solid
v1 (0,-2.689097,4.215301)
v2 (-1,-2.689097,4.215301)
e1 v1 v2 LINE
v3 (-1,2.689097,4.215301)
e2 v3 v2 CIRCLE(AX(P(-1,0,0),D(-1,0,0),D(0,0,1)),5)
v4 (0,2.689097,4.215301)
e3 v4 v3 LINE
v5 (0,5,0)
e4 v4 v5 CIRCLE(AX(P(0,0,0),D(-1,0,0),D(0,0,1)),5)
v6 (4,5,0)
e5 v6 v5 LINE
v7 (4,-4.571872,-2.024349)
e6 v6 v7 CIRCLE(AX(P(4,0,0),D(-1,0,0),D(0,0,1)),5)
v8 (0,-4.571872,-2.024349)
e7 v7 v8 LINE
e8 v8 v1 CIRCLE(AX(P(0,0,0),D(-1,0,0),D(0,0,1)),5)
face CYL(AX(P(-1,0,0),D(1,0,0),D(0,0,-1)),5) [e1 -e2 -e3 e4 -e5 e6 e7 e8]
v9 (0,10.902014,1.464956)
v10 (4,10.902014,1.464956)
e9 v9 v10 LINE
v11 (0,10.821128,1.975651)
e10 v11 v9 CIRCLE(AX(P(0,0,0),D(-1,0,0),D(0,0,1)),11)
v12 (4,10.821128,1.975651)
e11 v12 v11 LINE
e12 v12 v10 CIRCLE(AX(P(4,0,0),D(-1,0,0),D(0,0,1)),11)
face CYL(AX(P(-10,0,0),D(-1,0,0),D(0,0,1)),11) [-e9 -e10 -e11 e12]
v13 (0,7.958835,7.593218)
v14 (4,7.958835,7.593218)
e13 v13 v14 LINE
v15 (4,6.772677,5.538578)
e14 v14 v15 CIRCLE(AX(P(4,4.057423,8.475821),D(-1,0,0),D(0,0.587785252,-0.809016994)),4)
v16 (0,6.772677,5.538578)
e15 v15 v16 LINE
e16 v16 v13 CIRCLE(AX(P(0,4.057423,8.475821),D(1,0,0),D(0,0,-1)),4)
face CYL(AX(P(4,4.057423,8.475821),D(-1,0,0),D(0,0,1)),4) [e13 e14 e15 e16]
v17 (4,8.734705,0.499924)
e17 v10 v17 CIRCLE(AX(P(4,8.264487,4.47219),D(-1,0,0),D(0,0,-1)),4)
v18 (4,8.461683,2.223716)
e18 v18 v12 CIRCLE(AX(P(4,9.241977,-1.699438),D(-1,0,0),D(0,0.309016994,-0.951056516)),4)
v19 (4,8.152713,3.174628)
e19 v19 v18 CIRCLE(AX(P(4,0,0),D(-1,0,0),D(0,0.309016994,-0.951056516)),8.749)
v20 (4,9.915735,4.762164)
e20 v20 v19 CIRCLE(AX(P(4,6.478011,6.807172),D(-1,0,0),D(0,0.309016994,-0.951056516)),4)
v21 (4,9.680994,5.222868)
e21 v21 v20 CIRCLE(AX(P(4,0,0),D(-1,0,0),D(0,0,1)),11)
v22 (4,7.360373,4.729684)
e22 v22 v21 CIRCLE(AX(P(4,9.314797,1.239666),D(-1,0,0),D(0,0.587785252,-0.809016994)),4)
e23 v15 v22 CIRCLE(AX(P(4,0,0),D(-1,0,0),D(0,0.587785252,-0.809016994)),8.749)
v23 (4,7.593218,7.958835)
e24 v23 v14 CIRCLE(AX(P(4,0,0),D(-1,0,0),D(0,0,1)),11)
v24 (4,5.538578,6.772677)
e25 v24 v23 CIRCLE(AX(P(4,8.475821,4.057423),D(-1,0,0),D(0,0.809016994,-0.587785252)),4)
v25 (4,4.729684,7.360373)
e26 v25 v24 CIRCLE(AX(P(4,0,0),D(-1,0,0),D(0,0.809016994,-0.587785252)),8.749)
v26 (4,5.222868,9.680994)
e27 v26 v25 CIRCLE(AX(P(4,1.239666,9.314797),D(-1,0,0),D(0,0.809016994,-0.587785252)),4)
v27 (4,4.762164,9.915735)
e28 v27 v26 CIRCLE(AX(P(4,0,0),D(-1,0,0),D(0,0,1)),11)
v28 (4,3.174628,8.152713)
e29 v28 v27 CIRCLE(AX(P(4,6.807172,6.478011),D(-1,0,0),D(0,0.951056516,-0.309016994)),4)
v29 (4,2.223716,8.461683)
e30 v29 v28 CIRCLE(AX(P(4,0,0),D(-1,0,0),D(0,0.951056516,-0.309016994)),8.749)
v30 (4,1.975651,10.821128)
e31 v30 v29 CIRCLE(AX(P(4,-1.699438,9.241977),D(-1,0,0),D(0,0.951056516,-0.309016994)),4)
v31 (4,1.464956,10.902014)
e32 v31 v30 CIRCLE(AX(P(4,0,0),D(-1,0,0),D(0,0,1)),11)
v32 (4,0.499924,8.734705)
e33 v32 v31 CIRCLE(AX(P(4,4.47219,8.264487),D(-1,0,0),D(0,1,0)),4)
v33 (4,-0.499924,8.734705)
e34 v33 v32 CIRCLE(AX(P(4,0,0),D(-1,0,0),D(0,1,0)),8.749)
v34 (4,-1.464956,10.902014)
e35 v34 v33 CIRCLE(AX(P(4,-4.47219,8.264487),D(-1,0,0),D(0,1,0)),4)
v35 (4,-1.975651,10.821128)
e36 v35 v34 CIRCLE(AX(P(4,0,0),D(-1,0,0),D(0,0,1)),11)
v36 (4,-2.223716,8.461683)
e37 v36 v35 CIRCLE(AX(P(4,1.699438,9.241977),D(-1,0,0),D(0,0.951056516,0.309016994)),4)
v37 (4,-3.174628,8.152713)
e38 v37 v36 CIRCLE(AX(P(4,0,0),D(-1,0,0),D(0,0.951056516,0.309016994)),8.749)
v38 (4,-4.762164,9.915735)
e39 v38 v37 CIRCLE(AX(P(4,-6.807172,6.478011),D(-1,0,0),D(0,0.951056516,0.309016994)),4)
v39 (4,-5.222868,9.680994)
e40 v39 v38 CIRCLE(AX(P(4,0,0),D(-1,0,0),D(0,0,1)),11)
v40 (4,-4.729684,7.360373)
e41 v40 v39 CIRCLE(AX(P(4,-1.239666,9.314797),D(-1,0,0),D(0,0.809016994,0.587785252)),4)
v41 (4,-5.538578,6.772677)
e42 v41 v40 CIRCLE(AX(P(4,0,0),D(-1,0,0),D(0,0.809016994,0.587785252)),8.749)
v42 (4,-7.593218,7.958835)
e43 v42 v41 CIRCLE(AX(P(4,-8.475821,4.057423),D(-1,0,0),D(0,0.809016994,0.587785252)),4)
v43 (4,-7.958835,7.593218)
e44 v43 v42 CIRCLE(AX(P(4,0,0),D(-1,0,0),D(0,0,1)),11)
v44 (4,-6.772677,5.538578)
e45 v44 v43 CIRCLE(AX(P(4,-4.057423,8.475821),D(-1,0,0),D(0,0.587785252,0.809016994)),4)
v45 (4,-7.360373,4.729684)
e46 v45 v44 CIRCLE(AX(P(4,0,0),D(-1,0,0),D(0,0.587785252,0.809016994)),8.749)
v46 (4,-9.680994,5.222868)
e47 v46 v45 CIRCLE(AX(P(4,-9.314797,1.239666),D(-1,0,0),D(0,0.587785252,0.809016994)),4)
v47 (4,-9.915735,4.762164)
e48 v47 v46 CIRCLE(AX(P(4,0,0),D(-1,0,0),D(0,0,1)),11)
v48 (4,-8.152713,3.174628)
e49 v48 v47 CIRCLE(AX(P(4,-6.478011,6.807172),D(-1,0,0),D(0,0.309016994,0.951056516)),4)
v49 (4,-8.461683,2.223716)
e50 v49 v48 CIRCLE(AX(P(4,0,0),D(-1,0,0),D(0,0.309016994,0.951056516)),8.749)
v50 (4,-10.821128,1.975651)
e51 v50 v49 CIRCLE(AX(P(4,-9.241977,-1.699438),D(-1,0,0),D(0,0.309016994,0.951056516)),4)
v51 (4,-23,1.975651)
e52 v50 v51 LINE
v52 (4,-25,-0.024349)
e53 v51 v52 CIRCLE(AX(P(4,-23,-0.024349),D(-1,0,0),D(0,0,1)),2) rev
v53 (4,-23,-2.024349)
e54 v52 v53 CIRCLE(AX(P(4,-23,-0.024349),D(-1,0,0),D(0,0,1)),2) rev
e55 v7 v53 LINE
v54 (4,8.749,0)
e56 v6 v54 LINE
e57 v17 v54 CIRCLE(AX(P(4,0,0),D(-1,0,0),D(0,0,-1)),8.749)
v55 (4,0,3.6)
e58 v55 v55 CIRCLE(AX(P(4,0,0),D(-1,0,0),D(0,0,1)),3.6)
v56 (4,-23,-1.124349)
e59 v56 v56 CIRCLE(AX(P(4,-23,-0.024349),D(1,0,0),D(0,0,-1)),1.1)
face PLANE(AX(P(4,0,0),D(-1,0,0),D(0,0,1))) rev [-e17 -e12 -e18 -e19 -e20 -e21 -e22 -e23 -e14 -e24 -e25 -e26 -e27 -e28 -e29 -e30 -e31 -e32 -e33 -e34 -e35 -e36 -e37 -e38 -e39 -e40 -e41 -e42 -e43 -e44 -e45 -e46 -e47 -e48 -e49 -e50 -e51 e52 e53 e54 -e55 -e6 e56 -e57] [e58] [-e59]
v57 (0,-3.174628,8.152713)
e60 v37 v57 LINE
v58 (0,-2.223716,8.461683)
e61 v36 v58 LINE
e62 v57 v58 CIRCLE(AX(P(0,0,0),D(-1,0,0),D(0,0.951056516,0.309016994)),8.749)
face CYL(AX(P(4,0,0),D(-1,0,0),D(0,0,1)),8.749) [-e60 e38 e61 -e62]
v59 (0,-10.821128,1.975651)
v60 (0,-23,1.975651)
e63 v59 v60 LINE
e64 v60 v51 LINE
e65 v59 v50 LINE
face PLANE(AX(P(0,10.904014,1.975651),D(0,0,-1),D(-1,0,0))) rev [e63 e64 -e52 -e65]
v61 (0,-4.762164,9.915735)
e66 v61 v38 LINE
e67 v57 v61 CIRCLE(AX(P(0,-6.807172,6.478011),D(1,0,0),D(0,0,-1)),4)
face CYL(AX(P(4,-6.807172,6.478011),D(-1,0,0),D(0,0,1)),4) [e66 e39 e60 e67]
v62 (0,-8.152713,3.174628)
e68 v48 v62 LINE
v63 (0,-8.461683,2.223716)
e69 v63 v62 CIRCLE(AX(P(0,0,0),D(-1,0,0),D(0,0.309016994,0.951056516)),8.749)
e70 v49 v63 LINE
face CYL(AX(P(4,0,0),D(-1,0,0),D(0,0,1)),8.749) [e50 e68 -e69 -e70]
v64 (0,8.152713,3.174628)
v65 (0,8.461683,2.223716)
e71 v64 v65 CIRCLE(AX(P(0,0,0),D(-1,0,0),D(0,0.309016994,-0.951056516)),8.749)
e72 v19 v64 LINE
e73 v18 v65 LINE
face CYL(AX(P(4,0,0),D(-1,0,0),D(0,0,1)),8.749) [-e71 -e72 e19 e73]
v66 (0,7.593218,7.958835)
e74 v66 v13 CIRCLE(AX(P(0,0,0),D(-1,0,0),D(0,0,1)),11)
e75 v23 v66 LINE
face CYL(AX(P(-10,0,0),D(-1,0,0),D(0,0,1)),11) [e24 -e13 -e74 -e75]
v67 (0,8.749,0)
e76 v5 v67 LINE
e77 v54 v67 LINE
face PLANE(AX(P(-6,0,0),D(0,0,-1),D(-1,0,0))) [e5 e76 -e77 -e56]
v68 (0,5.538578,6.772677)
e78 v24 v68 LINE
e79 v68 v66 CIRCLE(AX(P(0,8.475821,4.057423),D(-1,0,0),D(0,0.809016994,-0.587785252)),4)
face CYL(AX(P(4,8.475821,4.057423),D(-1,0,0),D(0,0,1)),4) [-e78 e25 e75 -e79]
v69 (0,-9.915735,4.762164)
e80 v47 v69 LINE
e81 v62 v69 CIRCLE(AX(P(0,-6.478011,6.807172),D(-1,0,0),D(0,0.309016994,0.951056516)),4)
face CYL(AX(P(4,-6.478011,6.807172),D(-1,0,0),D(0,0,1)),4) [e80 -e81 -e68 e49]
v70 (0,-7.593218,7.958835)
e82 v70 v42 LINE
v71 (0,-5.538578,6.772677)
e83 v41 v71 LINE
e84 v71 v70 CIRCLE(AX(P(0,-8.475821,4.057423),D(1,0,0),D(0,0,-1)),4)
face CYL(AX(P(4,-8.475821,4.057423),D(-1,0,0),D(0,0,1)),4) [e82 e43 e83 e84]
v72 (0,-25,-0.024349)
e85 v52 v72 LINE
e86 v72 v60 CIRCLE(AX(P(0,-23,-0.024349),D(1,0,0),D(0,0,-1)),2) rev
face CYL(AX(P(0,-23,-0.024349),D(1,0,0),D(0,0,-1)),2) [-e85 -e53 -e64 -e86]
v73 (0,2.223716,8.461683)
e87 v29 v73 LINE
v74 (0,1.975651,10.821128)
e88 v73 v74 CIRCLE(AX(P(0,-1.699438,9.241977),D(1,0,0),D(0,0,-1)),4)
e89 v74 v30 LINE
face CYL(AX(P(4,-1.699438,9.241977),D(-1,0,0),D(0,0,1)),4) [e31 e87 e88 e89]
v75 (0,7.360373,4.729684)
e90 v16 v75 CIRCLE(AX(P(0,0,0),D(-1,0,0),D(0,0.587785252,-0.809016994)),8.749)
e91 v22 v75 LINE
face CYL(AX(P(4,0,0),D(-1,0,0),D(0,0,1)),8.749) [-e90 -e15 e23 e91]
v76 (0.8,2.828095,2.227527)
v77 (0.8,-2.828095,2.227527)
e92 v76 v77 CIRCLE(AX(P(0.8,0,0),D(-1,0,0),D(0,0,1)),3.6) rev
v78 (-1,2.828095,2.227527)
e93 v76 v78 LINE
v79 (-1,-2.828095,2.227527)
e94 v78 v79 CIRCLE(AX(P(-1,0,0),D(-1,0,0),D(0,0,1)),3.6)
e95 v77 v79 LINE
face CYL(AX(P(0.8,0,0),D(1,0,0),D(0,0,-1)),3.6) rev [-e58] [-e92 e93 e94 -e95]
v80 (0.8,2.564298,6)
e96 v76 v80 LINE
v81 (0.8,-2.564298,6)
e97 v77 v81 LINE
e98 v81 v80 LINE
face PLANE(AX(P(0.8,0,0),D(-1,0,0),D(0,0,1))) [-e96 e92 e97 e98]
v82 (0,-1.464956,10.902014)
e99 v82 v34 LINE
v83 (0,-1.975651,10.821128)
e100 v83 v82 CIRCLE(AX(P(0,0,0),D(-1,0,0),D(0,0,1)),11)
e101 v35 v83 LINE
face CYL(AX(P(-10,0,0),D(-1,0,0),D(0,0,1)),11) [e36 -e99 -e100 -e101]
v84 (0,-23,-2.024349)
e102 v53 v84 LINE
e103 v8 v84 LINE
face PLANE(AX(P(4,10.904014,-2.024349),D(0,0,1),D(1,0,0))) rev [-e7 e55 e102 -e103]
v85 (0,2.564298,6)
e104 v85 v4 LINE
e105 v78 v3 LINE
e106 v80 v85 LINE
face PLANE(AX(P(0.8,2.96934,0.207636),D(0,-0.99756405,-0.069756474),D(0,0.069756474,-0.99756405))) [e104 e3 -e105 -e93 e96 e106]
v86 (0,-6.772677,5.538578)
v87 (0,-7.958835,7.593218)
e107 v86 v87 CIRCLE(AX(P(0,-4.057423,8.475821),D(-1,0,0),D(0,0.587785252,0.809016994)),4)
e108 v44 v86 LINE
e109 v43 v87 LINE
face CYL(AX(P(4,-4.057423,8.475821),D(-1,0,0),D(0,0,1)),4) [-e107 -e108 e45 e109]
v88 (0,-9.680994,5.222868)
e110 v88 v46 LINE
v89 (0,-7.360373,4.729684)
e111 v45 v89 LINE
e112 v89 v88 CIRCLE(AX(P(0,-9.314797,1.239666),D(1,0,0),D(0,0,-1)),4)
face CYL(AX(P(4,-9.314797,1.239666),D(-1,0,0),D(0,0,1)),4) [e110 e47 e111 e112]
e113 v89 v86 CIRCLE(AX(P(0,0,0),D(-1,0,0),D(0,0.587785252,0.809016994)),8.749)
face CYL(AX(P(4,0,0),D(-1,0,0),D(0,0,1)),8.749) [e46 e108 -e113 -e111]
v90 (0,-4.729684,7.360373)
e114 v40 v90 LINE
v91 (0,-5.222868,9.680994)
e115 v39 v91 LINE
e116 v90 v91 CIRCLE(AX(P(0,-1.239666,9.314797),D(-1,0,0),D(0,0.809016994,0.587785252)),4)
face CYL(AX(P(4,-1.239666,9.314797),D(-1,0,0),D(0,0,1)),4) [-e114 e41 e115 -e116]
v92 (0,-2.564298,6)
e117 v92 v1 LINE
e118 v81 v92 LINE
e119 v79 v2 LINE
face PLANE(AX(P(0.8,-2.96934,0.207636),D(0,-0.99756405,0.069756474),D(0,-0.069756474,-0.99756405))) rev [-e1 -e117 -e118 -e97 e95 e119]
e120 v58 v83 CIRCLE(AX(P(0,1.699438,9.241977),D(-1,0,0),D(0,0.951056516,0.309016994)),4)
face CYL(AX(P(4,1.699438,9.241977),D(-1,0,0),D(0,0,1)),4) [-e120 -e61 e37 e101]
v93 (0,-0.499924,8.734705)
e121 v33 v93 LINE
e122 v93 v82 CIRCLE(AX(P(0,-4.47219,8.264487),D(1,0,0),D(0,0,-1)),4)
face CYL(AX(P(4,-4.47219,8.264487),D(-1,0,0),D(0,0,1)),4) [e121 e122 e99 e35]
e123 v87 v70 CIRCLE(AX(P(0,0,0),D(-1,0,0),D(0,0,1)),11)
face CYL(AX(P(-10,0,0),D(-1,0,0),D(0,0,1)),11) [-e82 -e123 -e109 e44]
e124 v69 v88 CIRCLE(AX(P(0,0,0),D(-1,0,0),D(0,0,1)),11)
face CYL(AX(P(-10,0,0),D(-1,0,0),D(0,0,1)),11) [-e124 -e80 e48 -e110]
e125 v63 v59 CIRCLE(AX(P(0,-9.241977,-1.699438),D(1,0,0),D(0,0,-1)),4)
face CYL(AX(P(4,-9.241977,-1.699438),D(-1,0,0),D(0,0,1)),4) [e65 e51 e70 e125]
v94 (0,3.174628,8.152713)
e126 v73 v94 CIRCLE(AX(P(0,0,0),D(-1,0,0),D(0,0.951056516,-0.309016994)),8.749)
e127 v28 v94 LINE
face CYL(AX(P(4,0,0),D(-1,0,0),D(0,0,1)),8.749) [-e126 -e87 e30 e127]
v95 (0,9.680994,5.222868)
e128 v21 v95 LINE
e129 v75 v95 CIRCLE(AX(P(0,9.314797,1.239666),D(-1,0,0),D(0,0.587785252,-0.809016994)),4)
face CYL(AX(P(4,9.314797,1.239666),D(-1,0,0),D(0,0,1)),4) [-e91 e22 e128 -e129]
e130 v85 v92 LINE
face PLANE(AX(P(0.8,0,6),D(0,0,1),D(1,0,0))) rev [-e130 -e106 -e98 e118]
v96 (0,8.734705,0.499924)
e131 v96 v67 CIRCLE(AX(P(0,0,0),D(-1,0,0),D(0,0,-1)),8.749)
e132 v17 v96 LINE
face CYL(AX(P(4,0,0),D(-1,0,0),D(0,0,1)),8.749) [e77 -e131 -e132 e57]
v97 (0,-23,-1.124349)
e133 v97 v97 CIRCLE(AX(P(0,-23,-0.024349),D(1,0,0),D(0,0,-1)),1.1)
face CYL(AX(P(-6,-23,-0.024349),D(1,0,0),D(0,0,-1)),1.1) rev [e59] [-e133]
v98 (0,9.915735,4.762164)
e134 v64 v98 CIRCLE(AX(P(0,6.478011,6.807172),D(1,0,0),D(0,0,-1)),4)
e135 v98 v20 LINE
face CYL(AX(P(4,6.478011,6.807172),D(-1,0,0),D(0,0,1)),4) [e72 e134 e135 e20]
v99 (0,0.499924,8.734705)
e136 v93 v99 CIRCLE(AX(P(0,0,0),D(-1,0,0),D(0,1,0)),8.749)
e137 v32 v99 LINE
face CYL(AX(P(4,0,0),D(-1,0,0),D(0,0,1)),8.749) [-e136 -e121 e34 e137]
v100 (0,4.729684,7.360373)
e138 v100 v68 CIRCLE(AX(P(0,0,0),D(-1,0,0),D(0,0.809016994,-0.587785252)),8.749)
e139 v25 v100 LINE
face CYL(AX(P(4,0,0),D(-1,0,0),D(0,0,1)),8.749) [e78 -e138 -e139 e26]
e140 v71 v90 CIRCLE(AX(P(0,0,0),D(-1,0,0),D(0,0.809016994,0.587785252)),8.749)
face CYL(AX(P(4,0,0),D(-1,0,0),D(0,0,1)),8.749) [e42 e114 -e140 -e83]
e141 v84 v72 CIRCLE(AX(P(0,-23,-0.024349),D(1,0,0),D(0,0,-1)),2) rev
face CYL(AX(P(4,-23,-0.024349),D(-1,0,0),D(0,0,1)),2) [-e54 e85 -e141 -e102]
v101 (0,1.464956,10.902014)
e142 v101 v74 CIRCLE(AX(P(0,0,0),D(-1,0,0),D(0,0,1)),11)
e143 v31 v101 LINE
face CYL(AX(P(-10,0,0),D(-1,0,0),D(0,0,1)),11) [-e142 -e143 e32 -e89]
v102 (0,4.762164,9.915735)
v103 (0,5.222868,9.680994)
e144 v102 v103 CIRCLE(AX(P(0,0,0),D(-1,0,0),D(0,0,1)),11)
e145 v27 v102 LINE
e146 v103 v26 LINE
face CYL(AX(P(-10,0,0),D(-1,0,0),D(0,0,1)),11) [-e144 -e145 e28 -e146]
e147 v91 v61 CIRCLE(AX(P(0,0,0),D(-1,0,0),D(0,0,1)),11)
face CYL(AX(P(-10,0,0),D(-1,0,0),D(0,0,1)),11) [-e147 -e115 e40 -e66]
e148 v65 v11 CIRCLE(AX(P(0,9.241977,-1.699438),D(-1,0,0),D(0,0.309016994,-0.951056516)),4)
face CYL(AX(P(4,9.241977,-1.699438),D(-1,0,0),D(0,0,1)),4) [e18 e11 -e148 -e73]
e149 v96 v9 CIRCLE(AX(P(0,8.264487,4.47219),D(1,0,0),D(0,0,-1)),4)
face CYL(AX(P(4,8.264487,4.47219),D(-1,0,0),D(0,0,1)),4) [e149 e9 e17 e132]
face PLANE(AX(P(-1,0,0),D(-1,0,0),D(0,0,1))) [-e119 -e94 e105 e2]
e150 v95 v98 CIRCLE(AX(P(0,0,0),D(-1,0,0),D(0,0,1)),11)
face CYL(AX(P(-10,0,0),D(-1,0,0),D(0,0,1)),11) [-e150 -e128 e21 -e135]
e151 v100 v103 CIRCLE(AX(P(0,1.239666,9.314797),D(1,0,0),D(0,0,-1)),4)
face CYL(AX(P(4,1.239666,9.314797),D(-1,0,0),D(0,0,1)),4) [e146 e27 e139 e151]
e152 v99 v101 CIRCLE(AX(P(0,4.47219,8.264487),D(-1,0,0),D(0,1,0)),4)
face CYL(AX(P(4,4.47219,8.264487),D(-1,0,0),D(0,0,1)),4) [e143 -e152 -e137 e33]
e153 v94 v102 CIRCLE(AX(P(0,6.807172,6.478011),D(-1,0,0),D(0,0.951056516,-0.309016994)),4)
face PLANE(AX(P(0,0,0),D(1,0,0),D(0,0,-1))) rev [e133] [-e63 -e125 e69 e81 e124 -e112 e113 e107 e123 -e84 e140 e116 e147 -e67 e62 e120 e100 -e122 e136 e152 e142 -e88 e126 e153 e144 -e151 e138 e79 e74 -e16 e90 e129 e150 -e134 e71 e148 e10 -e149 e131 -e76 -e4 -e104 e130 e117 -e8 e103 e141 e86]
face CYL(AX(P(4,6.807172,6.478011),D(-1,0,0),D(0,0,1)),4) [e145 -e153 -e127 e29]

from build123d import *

# Parameters (mm, degrees)
BASPROSKE_W         = 4
BASPROSKE_H         = 11
TOOTHCUT_DEPTH      = 17.062378404
TEETHCUTS_COUNT     = 20
TEETHCUTS_ANGLE     = 342
BORSKE_R            = 1
BORE_DEPTH          = 50.0000508
CUT_EXTRUDE_1_DEPTH = 10
EXTRUDE_1_REACH     = 39.733
SKETCH_3_W          = 4
SKETCH_3_H          = 4
FILLET_1_R          = 2
SKETCH_4_R          = 1.1
CUT_EXTRUDE_2_DEPTH = 10
EXTRUDE_START       = -4
SKETCH_5_R          = 1
EXTRUDE_2_DEPTH     = 4
EXTRUDE_3_DEPTH     = 1
EXTRUDE_START_2     = 4
EXTRUDE_4_DEPTH     = 4
SKETCH_8_R          = 3.6
CUT_EXTRUDE_3_DEPTH = 3.2
CUT_EXTRUDE_START   = -23.2
SKETCH_10_R         = 3.6
CUT_EXTRUDE_4_DEPTH = 23.2
SKETCH_11_R         = 3.6
EXTRUDE_5_DEPTH     = 1
CUT_EXTRUDE_START_2 = -1
SKETCH_12_R         = 3.6
CUT_EXTRUDE_5_DEPTH = 1
CUT_EXTRUDE_START_3 = -1.8
CUT_EXTRUDE_6_DEPTH = 1.8


with BuildPart() as part:
    # BasProSke → Base-Revolve (revolve)
    with BuildSketch(Plane(origin=(0, 0, 0), x_dir=(1, 0, 0), z_dir=(0, 1, 0)), mode=Mode.PRIVATE) as base_revolve_sk:
        with Locations((2, 5.5)):
            Rectangle(BASPROSKE_W, BASPROSKE_H)
    revolve(base_revolve_sk.sketch.rotate(Axis((-10, 0, 0), (1, 0, 0)), 180), axis=Axis((-10, 0, 0), (1, 0, 0)))

    # TooCutSke → ToothCut (cut, through all)
    with BuildSketch(Plane(origin=(0, 0, 0), x_dir=(0, 0, -1), z_dir=(1, 0, 0))):
        with BuildLine():
            ThreePointArc((0.499924007, 8.734705318), (0, 8.749), (-0.499924007, 8.734705318))
            ThreePointArc((-0.499924007, 8.734705318), (-0.824302243, 9.905497836), (-1.485192705, 10.924909509))
            ThreePointArc((-1.485192705, 10.924909509), (0, 11.0254), (1.485192705, 10.924909509))
            ThreePointArc((1.485192705, 10.924909509), (0.824302243, 9.905497836), (0.499924007, 8.734705318))
        make_face()
    toothcut = extrude(amount=TOOTHCUT_DEPTH, mode=Mode.SUBTRACT)

    # TeethCuts: ToothCut ×20 about axis
    teethcuts_axis = Axis((-10, 0, 0), (1, 0, 0))
    for i in range(1, TEETHCUTS_COUNT):
        add(toothcut.rotate(teethcuts_axis, i * TEETHCUTS_ANGLE / (TEETHCUTS_COUNT - 1)), mode=Mode.SUBTRACT)

    # BorSke → Bore (cut, symmetric)
    with BuildSketch(Plane(origin=(0, 0, 0), x_dir=(0, 0, -1), z_dir=(1, 0, 0))):
        with Locations(Location((0, 0, 0), (0, 0, 180))):
            Circle(BORSKE_R)
    extrude(amount=BORE_DEPTH, both=True, mode=Mode.SUBTRACT)

    # 草图1 → 切除-拉伸1 (cut)
    with BuildSketch(Plane(origin=(4, 0, 0), x_dir=(0, 0, -1), z_dir=(1, 0, 0))):
        with BuildLine():
            Line((0, 12.401538845), (0, 2.5))
            ThreePointArc((0, 2.5), (1.767766953, 1.767766953), (2.5, 0))
            ThreePointArc((2.5, 0), (1.767766953, -1.767766953), (0, -2.5))
            Line((0, -2.5), (0, -15.030002789))
            Line((0, -15.030002789), (15.193341894, -15.030002789))
            Line((15.193341894, -15.030002789), (15.193341894, 12.401538845))
            Line((15.193341894, 12.401538845), (0, 12.401538845))
        make_face()
    extrude(amount=-CUT_EXTRUDE_1_DEPTH, mode=Mode.SUBTRACT)

    # 草图3 → 凸台-拉伸1 (add, up to next)
    with BuildSketch(Plane(origin=(0, -25, 0), x_dir=(1, 0, 0), z_dir=(0, 1, 0)), mode=Mode.PRIVATE) as extrude_1_sk1:
        with Locations((2, 0.024348859)):
            Rectangle(SKETCH_3_W, SKETCH_3_H)
    extrude_1_tool1 = extrude(extrude_1_sk1.sketch, amount=EXTRUDE_1_REACH, mode=Mode.PRIVATE) - part.part
    add(extrude_1_tool1.solids().sort_by_distance((2, -25, -0.024349))[0])

    # 圆角1
    fillet_1_edges = [part.edges().sort_by_distance(p)[0] for p in [
        (2, -25, 1.975651141),
        (2, -25, -2.024348859),
    ]]
    fillet(fillet_1_edges, radius=FILLET_1_R - 0.0001)  # a hair under: the kernel refuses the full size

    # 草图4 → 切除-拉伸2 (cut)
    with BuildSketch(Plane(origin=(4, 0, 0), x_dir=(0, 0, -1), z_dir=(1, 0, 0))):
        with Locations((0.024348859, -23)):
            Circle(SKETCH_4_R)
    extrude(amount=-CUT_EXTRUDE_2_DEPTH, mode=Mode.SUBTRACT)

    # 草图5 → 凸台-拉伸2 (add)
    with BuildSketch(Plane.ZY.offset(EXTRUDE_START)):
        Circle(SKETCH_5_R)
    extrude(amount=EXTRUDE_2_DEPTH)

    # 草图6 → 凸台-拉伸3 (add)
    with BuildSketch(Plane.ZY):
        with BuildLine():
            Line((0, 5), (0, 2.5))
            ThreePointArc((0, 2.5), (-2.226817699, 1.136346309), (-2.024348859, -1.466973653))
            Line((-2.024348859, -1.466973653), (-2.024348859, -4.571871794))
            ThreePointArc((-2.024348859, -4.571871794), (2.727476463, -4.19056943), (5, 0))
            ThreePointArc((5, 0), (3.535533906, 3.535533906), (0, 5))
        make_face()
        with BuildLine():
            ThreePointArc((-2.024348859, -1.466973653), (-2.226817699, 1.136346309), (0, 2.5))
            Line((0, 2.5), (0, 5))
            ThreePointArc((0, 5), (-4.891797163, 1.034562959), (-2.024348859, -4.571871794))
            Line((-2.024348859, -4.571871794), (-2.024348859, -1.466973653))
        make_face()
        with BuildLine():
            Line((0, 5), (0, 2.5))
            ThreePointArc((0, 2.5), (-2.226817699, 1.136346309), (-2.024348859, -1.466973653))
            Line((-2.024348859, -1.466973653), (-2.024348859, -4.571871794))
            ThreePointArc((-2.024348859, -4.571871794), (2.727476463, -4.19056943), (5, 0))
            ThreePointArc((5, 0), (3.535533906, 3.535533906), (0, 5))
        make_face()
        with BuildLine():
            ThreePointArc((-2.024348859, -1.466973653), (-2.226817699, 1.136346309), (0, 2.5))
            Line((0, 2.5), (0, 5))
            ThreePointArc((0, 5), (-4.891797163, 1.034562959), (-2.024348859, -4.571871794))
            Line((-2.024348859, -4.571871794), (-2.024348859, -1.466973653))
        make_face()
    extrude(amount=EXTRUDE_3_DEPTH)

    # 草图7 → 凸台-拉伸4 (add)
    with BuildSketch(Plane(origin=(0, 0, 0), x_dir=(0, 0, -1), z_dir=(1, 0, 0)).offset(EXTRUDE_START_2)):
        with BuildLine():
            Line((0, 5), (0, 2.5))
            ThreePointArc((0, 2.5), (2.226817699, 1.136346309), (2.024348859, -1.466973653))
            Line((2.024348859, -1.466973653), (2.024348859, -4.571871794))
            ThreePointArc((2.024348859, -4.571871794), (4.891797163, 1.034562959), (0, 5))
        make_face()
    extrude(amount=-EXTRUDE_4_DEPTH)

    # 草图8 → 切除-拉伸3 (cut)
    with BuildSketch(Plane(origin=(4, 0, 0), x_dir=(0, 0, -1), z_dir=(1, 0, 0))):
        Circle(SKETCH_8_R)
    extrude(amount=-CUT_EXTRUDE_3_DEPTH, mode=Mode.SUBTRACT)

    # 草图10 → 切除-拉伸4 (cut)
    with BuildSketch(Plane.ZY.offset(1).offset(CUT_EXTRUDE_START)):
        with Locations(Location((0, 0, 0), (0, 0, 180))):
            Circle(SKETCH_10_R)
    extrude(amount=CUT_EXTRUDE_4_DEPTH, mode=Mode.SUBTRACT)

    # 草图11 → 凸台-拉伸5 (add)
    with BuildSketch(Plane(origin=(4, 0, 0), x_dir=(0, 0, -1), z_dir=(1, 0, 0))):
        Circle(SKETCH_11_R)
    extrude(amount=-EXTRUDE_5_DEPTH)

    # 草图12 → 切除-拉伸5 (cut)
    with BuildSketch(Plane.ZY.offset(-3).offset(CUT_EXTRUDE_START_2)):
        Circle(SKETCH_12_R)
    extrude(amount=CUT_EXTRUDE_5_DEPTH, mode=Mode.SUBTRACT)

    # 草图13 → 切除-拉伸6 (cut)
    with BuildSketch(Plane.ZY.offset(1).offset(CUT_EXTRUDE_START_3)):
        with BuildLine():
            Line((6, 2.564298292), (2.227527106, 2.828095294))
            ThreePointArc((2.227527106, 2.828095294), (3.6, 0), (2.227527106, -2.828095294))
            Line((2.227527106, -2.828095294), (6, -2.564298292))
            Line((6, -2.564298292), (6, 2.564298292))
        make_face()
    extrude(amount=CUT_EXTRUDE_6_DEPTH, mode=Mode.SUBTRACT)


solid = part.part
